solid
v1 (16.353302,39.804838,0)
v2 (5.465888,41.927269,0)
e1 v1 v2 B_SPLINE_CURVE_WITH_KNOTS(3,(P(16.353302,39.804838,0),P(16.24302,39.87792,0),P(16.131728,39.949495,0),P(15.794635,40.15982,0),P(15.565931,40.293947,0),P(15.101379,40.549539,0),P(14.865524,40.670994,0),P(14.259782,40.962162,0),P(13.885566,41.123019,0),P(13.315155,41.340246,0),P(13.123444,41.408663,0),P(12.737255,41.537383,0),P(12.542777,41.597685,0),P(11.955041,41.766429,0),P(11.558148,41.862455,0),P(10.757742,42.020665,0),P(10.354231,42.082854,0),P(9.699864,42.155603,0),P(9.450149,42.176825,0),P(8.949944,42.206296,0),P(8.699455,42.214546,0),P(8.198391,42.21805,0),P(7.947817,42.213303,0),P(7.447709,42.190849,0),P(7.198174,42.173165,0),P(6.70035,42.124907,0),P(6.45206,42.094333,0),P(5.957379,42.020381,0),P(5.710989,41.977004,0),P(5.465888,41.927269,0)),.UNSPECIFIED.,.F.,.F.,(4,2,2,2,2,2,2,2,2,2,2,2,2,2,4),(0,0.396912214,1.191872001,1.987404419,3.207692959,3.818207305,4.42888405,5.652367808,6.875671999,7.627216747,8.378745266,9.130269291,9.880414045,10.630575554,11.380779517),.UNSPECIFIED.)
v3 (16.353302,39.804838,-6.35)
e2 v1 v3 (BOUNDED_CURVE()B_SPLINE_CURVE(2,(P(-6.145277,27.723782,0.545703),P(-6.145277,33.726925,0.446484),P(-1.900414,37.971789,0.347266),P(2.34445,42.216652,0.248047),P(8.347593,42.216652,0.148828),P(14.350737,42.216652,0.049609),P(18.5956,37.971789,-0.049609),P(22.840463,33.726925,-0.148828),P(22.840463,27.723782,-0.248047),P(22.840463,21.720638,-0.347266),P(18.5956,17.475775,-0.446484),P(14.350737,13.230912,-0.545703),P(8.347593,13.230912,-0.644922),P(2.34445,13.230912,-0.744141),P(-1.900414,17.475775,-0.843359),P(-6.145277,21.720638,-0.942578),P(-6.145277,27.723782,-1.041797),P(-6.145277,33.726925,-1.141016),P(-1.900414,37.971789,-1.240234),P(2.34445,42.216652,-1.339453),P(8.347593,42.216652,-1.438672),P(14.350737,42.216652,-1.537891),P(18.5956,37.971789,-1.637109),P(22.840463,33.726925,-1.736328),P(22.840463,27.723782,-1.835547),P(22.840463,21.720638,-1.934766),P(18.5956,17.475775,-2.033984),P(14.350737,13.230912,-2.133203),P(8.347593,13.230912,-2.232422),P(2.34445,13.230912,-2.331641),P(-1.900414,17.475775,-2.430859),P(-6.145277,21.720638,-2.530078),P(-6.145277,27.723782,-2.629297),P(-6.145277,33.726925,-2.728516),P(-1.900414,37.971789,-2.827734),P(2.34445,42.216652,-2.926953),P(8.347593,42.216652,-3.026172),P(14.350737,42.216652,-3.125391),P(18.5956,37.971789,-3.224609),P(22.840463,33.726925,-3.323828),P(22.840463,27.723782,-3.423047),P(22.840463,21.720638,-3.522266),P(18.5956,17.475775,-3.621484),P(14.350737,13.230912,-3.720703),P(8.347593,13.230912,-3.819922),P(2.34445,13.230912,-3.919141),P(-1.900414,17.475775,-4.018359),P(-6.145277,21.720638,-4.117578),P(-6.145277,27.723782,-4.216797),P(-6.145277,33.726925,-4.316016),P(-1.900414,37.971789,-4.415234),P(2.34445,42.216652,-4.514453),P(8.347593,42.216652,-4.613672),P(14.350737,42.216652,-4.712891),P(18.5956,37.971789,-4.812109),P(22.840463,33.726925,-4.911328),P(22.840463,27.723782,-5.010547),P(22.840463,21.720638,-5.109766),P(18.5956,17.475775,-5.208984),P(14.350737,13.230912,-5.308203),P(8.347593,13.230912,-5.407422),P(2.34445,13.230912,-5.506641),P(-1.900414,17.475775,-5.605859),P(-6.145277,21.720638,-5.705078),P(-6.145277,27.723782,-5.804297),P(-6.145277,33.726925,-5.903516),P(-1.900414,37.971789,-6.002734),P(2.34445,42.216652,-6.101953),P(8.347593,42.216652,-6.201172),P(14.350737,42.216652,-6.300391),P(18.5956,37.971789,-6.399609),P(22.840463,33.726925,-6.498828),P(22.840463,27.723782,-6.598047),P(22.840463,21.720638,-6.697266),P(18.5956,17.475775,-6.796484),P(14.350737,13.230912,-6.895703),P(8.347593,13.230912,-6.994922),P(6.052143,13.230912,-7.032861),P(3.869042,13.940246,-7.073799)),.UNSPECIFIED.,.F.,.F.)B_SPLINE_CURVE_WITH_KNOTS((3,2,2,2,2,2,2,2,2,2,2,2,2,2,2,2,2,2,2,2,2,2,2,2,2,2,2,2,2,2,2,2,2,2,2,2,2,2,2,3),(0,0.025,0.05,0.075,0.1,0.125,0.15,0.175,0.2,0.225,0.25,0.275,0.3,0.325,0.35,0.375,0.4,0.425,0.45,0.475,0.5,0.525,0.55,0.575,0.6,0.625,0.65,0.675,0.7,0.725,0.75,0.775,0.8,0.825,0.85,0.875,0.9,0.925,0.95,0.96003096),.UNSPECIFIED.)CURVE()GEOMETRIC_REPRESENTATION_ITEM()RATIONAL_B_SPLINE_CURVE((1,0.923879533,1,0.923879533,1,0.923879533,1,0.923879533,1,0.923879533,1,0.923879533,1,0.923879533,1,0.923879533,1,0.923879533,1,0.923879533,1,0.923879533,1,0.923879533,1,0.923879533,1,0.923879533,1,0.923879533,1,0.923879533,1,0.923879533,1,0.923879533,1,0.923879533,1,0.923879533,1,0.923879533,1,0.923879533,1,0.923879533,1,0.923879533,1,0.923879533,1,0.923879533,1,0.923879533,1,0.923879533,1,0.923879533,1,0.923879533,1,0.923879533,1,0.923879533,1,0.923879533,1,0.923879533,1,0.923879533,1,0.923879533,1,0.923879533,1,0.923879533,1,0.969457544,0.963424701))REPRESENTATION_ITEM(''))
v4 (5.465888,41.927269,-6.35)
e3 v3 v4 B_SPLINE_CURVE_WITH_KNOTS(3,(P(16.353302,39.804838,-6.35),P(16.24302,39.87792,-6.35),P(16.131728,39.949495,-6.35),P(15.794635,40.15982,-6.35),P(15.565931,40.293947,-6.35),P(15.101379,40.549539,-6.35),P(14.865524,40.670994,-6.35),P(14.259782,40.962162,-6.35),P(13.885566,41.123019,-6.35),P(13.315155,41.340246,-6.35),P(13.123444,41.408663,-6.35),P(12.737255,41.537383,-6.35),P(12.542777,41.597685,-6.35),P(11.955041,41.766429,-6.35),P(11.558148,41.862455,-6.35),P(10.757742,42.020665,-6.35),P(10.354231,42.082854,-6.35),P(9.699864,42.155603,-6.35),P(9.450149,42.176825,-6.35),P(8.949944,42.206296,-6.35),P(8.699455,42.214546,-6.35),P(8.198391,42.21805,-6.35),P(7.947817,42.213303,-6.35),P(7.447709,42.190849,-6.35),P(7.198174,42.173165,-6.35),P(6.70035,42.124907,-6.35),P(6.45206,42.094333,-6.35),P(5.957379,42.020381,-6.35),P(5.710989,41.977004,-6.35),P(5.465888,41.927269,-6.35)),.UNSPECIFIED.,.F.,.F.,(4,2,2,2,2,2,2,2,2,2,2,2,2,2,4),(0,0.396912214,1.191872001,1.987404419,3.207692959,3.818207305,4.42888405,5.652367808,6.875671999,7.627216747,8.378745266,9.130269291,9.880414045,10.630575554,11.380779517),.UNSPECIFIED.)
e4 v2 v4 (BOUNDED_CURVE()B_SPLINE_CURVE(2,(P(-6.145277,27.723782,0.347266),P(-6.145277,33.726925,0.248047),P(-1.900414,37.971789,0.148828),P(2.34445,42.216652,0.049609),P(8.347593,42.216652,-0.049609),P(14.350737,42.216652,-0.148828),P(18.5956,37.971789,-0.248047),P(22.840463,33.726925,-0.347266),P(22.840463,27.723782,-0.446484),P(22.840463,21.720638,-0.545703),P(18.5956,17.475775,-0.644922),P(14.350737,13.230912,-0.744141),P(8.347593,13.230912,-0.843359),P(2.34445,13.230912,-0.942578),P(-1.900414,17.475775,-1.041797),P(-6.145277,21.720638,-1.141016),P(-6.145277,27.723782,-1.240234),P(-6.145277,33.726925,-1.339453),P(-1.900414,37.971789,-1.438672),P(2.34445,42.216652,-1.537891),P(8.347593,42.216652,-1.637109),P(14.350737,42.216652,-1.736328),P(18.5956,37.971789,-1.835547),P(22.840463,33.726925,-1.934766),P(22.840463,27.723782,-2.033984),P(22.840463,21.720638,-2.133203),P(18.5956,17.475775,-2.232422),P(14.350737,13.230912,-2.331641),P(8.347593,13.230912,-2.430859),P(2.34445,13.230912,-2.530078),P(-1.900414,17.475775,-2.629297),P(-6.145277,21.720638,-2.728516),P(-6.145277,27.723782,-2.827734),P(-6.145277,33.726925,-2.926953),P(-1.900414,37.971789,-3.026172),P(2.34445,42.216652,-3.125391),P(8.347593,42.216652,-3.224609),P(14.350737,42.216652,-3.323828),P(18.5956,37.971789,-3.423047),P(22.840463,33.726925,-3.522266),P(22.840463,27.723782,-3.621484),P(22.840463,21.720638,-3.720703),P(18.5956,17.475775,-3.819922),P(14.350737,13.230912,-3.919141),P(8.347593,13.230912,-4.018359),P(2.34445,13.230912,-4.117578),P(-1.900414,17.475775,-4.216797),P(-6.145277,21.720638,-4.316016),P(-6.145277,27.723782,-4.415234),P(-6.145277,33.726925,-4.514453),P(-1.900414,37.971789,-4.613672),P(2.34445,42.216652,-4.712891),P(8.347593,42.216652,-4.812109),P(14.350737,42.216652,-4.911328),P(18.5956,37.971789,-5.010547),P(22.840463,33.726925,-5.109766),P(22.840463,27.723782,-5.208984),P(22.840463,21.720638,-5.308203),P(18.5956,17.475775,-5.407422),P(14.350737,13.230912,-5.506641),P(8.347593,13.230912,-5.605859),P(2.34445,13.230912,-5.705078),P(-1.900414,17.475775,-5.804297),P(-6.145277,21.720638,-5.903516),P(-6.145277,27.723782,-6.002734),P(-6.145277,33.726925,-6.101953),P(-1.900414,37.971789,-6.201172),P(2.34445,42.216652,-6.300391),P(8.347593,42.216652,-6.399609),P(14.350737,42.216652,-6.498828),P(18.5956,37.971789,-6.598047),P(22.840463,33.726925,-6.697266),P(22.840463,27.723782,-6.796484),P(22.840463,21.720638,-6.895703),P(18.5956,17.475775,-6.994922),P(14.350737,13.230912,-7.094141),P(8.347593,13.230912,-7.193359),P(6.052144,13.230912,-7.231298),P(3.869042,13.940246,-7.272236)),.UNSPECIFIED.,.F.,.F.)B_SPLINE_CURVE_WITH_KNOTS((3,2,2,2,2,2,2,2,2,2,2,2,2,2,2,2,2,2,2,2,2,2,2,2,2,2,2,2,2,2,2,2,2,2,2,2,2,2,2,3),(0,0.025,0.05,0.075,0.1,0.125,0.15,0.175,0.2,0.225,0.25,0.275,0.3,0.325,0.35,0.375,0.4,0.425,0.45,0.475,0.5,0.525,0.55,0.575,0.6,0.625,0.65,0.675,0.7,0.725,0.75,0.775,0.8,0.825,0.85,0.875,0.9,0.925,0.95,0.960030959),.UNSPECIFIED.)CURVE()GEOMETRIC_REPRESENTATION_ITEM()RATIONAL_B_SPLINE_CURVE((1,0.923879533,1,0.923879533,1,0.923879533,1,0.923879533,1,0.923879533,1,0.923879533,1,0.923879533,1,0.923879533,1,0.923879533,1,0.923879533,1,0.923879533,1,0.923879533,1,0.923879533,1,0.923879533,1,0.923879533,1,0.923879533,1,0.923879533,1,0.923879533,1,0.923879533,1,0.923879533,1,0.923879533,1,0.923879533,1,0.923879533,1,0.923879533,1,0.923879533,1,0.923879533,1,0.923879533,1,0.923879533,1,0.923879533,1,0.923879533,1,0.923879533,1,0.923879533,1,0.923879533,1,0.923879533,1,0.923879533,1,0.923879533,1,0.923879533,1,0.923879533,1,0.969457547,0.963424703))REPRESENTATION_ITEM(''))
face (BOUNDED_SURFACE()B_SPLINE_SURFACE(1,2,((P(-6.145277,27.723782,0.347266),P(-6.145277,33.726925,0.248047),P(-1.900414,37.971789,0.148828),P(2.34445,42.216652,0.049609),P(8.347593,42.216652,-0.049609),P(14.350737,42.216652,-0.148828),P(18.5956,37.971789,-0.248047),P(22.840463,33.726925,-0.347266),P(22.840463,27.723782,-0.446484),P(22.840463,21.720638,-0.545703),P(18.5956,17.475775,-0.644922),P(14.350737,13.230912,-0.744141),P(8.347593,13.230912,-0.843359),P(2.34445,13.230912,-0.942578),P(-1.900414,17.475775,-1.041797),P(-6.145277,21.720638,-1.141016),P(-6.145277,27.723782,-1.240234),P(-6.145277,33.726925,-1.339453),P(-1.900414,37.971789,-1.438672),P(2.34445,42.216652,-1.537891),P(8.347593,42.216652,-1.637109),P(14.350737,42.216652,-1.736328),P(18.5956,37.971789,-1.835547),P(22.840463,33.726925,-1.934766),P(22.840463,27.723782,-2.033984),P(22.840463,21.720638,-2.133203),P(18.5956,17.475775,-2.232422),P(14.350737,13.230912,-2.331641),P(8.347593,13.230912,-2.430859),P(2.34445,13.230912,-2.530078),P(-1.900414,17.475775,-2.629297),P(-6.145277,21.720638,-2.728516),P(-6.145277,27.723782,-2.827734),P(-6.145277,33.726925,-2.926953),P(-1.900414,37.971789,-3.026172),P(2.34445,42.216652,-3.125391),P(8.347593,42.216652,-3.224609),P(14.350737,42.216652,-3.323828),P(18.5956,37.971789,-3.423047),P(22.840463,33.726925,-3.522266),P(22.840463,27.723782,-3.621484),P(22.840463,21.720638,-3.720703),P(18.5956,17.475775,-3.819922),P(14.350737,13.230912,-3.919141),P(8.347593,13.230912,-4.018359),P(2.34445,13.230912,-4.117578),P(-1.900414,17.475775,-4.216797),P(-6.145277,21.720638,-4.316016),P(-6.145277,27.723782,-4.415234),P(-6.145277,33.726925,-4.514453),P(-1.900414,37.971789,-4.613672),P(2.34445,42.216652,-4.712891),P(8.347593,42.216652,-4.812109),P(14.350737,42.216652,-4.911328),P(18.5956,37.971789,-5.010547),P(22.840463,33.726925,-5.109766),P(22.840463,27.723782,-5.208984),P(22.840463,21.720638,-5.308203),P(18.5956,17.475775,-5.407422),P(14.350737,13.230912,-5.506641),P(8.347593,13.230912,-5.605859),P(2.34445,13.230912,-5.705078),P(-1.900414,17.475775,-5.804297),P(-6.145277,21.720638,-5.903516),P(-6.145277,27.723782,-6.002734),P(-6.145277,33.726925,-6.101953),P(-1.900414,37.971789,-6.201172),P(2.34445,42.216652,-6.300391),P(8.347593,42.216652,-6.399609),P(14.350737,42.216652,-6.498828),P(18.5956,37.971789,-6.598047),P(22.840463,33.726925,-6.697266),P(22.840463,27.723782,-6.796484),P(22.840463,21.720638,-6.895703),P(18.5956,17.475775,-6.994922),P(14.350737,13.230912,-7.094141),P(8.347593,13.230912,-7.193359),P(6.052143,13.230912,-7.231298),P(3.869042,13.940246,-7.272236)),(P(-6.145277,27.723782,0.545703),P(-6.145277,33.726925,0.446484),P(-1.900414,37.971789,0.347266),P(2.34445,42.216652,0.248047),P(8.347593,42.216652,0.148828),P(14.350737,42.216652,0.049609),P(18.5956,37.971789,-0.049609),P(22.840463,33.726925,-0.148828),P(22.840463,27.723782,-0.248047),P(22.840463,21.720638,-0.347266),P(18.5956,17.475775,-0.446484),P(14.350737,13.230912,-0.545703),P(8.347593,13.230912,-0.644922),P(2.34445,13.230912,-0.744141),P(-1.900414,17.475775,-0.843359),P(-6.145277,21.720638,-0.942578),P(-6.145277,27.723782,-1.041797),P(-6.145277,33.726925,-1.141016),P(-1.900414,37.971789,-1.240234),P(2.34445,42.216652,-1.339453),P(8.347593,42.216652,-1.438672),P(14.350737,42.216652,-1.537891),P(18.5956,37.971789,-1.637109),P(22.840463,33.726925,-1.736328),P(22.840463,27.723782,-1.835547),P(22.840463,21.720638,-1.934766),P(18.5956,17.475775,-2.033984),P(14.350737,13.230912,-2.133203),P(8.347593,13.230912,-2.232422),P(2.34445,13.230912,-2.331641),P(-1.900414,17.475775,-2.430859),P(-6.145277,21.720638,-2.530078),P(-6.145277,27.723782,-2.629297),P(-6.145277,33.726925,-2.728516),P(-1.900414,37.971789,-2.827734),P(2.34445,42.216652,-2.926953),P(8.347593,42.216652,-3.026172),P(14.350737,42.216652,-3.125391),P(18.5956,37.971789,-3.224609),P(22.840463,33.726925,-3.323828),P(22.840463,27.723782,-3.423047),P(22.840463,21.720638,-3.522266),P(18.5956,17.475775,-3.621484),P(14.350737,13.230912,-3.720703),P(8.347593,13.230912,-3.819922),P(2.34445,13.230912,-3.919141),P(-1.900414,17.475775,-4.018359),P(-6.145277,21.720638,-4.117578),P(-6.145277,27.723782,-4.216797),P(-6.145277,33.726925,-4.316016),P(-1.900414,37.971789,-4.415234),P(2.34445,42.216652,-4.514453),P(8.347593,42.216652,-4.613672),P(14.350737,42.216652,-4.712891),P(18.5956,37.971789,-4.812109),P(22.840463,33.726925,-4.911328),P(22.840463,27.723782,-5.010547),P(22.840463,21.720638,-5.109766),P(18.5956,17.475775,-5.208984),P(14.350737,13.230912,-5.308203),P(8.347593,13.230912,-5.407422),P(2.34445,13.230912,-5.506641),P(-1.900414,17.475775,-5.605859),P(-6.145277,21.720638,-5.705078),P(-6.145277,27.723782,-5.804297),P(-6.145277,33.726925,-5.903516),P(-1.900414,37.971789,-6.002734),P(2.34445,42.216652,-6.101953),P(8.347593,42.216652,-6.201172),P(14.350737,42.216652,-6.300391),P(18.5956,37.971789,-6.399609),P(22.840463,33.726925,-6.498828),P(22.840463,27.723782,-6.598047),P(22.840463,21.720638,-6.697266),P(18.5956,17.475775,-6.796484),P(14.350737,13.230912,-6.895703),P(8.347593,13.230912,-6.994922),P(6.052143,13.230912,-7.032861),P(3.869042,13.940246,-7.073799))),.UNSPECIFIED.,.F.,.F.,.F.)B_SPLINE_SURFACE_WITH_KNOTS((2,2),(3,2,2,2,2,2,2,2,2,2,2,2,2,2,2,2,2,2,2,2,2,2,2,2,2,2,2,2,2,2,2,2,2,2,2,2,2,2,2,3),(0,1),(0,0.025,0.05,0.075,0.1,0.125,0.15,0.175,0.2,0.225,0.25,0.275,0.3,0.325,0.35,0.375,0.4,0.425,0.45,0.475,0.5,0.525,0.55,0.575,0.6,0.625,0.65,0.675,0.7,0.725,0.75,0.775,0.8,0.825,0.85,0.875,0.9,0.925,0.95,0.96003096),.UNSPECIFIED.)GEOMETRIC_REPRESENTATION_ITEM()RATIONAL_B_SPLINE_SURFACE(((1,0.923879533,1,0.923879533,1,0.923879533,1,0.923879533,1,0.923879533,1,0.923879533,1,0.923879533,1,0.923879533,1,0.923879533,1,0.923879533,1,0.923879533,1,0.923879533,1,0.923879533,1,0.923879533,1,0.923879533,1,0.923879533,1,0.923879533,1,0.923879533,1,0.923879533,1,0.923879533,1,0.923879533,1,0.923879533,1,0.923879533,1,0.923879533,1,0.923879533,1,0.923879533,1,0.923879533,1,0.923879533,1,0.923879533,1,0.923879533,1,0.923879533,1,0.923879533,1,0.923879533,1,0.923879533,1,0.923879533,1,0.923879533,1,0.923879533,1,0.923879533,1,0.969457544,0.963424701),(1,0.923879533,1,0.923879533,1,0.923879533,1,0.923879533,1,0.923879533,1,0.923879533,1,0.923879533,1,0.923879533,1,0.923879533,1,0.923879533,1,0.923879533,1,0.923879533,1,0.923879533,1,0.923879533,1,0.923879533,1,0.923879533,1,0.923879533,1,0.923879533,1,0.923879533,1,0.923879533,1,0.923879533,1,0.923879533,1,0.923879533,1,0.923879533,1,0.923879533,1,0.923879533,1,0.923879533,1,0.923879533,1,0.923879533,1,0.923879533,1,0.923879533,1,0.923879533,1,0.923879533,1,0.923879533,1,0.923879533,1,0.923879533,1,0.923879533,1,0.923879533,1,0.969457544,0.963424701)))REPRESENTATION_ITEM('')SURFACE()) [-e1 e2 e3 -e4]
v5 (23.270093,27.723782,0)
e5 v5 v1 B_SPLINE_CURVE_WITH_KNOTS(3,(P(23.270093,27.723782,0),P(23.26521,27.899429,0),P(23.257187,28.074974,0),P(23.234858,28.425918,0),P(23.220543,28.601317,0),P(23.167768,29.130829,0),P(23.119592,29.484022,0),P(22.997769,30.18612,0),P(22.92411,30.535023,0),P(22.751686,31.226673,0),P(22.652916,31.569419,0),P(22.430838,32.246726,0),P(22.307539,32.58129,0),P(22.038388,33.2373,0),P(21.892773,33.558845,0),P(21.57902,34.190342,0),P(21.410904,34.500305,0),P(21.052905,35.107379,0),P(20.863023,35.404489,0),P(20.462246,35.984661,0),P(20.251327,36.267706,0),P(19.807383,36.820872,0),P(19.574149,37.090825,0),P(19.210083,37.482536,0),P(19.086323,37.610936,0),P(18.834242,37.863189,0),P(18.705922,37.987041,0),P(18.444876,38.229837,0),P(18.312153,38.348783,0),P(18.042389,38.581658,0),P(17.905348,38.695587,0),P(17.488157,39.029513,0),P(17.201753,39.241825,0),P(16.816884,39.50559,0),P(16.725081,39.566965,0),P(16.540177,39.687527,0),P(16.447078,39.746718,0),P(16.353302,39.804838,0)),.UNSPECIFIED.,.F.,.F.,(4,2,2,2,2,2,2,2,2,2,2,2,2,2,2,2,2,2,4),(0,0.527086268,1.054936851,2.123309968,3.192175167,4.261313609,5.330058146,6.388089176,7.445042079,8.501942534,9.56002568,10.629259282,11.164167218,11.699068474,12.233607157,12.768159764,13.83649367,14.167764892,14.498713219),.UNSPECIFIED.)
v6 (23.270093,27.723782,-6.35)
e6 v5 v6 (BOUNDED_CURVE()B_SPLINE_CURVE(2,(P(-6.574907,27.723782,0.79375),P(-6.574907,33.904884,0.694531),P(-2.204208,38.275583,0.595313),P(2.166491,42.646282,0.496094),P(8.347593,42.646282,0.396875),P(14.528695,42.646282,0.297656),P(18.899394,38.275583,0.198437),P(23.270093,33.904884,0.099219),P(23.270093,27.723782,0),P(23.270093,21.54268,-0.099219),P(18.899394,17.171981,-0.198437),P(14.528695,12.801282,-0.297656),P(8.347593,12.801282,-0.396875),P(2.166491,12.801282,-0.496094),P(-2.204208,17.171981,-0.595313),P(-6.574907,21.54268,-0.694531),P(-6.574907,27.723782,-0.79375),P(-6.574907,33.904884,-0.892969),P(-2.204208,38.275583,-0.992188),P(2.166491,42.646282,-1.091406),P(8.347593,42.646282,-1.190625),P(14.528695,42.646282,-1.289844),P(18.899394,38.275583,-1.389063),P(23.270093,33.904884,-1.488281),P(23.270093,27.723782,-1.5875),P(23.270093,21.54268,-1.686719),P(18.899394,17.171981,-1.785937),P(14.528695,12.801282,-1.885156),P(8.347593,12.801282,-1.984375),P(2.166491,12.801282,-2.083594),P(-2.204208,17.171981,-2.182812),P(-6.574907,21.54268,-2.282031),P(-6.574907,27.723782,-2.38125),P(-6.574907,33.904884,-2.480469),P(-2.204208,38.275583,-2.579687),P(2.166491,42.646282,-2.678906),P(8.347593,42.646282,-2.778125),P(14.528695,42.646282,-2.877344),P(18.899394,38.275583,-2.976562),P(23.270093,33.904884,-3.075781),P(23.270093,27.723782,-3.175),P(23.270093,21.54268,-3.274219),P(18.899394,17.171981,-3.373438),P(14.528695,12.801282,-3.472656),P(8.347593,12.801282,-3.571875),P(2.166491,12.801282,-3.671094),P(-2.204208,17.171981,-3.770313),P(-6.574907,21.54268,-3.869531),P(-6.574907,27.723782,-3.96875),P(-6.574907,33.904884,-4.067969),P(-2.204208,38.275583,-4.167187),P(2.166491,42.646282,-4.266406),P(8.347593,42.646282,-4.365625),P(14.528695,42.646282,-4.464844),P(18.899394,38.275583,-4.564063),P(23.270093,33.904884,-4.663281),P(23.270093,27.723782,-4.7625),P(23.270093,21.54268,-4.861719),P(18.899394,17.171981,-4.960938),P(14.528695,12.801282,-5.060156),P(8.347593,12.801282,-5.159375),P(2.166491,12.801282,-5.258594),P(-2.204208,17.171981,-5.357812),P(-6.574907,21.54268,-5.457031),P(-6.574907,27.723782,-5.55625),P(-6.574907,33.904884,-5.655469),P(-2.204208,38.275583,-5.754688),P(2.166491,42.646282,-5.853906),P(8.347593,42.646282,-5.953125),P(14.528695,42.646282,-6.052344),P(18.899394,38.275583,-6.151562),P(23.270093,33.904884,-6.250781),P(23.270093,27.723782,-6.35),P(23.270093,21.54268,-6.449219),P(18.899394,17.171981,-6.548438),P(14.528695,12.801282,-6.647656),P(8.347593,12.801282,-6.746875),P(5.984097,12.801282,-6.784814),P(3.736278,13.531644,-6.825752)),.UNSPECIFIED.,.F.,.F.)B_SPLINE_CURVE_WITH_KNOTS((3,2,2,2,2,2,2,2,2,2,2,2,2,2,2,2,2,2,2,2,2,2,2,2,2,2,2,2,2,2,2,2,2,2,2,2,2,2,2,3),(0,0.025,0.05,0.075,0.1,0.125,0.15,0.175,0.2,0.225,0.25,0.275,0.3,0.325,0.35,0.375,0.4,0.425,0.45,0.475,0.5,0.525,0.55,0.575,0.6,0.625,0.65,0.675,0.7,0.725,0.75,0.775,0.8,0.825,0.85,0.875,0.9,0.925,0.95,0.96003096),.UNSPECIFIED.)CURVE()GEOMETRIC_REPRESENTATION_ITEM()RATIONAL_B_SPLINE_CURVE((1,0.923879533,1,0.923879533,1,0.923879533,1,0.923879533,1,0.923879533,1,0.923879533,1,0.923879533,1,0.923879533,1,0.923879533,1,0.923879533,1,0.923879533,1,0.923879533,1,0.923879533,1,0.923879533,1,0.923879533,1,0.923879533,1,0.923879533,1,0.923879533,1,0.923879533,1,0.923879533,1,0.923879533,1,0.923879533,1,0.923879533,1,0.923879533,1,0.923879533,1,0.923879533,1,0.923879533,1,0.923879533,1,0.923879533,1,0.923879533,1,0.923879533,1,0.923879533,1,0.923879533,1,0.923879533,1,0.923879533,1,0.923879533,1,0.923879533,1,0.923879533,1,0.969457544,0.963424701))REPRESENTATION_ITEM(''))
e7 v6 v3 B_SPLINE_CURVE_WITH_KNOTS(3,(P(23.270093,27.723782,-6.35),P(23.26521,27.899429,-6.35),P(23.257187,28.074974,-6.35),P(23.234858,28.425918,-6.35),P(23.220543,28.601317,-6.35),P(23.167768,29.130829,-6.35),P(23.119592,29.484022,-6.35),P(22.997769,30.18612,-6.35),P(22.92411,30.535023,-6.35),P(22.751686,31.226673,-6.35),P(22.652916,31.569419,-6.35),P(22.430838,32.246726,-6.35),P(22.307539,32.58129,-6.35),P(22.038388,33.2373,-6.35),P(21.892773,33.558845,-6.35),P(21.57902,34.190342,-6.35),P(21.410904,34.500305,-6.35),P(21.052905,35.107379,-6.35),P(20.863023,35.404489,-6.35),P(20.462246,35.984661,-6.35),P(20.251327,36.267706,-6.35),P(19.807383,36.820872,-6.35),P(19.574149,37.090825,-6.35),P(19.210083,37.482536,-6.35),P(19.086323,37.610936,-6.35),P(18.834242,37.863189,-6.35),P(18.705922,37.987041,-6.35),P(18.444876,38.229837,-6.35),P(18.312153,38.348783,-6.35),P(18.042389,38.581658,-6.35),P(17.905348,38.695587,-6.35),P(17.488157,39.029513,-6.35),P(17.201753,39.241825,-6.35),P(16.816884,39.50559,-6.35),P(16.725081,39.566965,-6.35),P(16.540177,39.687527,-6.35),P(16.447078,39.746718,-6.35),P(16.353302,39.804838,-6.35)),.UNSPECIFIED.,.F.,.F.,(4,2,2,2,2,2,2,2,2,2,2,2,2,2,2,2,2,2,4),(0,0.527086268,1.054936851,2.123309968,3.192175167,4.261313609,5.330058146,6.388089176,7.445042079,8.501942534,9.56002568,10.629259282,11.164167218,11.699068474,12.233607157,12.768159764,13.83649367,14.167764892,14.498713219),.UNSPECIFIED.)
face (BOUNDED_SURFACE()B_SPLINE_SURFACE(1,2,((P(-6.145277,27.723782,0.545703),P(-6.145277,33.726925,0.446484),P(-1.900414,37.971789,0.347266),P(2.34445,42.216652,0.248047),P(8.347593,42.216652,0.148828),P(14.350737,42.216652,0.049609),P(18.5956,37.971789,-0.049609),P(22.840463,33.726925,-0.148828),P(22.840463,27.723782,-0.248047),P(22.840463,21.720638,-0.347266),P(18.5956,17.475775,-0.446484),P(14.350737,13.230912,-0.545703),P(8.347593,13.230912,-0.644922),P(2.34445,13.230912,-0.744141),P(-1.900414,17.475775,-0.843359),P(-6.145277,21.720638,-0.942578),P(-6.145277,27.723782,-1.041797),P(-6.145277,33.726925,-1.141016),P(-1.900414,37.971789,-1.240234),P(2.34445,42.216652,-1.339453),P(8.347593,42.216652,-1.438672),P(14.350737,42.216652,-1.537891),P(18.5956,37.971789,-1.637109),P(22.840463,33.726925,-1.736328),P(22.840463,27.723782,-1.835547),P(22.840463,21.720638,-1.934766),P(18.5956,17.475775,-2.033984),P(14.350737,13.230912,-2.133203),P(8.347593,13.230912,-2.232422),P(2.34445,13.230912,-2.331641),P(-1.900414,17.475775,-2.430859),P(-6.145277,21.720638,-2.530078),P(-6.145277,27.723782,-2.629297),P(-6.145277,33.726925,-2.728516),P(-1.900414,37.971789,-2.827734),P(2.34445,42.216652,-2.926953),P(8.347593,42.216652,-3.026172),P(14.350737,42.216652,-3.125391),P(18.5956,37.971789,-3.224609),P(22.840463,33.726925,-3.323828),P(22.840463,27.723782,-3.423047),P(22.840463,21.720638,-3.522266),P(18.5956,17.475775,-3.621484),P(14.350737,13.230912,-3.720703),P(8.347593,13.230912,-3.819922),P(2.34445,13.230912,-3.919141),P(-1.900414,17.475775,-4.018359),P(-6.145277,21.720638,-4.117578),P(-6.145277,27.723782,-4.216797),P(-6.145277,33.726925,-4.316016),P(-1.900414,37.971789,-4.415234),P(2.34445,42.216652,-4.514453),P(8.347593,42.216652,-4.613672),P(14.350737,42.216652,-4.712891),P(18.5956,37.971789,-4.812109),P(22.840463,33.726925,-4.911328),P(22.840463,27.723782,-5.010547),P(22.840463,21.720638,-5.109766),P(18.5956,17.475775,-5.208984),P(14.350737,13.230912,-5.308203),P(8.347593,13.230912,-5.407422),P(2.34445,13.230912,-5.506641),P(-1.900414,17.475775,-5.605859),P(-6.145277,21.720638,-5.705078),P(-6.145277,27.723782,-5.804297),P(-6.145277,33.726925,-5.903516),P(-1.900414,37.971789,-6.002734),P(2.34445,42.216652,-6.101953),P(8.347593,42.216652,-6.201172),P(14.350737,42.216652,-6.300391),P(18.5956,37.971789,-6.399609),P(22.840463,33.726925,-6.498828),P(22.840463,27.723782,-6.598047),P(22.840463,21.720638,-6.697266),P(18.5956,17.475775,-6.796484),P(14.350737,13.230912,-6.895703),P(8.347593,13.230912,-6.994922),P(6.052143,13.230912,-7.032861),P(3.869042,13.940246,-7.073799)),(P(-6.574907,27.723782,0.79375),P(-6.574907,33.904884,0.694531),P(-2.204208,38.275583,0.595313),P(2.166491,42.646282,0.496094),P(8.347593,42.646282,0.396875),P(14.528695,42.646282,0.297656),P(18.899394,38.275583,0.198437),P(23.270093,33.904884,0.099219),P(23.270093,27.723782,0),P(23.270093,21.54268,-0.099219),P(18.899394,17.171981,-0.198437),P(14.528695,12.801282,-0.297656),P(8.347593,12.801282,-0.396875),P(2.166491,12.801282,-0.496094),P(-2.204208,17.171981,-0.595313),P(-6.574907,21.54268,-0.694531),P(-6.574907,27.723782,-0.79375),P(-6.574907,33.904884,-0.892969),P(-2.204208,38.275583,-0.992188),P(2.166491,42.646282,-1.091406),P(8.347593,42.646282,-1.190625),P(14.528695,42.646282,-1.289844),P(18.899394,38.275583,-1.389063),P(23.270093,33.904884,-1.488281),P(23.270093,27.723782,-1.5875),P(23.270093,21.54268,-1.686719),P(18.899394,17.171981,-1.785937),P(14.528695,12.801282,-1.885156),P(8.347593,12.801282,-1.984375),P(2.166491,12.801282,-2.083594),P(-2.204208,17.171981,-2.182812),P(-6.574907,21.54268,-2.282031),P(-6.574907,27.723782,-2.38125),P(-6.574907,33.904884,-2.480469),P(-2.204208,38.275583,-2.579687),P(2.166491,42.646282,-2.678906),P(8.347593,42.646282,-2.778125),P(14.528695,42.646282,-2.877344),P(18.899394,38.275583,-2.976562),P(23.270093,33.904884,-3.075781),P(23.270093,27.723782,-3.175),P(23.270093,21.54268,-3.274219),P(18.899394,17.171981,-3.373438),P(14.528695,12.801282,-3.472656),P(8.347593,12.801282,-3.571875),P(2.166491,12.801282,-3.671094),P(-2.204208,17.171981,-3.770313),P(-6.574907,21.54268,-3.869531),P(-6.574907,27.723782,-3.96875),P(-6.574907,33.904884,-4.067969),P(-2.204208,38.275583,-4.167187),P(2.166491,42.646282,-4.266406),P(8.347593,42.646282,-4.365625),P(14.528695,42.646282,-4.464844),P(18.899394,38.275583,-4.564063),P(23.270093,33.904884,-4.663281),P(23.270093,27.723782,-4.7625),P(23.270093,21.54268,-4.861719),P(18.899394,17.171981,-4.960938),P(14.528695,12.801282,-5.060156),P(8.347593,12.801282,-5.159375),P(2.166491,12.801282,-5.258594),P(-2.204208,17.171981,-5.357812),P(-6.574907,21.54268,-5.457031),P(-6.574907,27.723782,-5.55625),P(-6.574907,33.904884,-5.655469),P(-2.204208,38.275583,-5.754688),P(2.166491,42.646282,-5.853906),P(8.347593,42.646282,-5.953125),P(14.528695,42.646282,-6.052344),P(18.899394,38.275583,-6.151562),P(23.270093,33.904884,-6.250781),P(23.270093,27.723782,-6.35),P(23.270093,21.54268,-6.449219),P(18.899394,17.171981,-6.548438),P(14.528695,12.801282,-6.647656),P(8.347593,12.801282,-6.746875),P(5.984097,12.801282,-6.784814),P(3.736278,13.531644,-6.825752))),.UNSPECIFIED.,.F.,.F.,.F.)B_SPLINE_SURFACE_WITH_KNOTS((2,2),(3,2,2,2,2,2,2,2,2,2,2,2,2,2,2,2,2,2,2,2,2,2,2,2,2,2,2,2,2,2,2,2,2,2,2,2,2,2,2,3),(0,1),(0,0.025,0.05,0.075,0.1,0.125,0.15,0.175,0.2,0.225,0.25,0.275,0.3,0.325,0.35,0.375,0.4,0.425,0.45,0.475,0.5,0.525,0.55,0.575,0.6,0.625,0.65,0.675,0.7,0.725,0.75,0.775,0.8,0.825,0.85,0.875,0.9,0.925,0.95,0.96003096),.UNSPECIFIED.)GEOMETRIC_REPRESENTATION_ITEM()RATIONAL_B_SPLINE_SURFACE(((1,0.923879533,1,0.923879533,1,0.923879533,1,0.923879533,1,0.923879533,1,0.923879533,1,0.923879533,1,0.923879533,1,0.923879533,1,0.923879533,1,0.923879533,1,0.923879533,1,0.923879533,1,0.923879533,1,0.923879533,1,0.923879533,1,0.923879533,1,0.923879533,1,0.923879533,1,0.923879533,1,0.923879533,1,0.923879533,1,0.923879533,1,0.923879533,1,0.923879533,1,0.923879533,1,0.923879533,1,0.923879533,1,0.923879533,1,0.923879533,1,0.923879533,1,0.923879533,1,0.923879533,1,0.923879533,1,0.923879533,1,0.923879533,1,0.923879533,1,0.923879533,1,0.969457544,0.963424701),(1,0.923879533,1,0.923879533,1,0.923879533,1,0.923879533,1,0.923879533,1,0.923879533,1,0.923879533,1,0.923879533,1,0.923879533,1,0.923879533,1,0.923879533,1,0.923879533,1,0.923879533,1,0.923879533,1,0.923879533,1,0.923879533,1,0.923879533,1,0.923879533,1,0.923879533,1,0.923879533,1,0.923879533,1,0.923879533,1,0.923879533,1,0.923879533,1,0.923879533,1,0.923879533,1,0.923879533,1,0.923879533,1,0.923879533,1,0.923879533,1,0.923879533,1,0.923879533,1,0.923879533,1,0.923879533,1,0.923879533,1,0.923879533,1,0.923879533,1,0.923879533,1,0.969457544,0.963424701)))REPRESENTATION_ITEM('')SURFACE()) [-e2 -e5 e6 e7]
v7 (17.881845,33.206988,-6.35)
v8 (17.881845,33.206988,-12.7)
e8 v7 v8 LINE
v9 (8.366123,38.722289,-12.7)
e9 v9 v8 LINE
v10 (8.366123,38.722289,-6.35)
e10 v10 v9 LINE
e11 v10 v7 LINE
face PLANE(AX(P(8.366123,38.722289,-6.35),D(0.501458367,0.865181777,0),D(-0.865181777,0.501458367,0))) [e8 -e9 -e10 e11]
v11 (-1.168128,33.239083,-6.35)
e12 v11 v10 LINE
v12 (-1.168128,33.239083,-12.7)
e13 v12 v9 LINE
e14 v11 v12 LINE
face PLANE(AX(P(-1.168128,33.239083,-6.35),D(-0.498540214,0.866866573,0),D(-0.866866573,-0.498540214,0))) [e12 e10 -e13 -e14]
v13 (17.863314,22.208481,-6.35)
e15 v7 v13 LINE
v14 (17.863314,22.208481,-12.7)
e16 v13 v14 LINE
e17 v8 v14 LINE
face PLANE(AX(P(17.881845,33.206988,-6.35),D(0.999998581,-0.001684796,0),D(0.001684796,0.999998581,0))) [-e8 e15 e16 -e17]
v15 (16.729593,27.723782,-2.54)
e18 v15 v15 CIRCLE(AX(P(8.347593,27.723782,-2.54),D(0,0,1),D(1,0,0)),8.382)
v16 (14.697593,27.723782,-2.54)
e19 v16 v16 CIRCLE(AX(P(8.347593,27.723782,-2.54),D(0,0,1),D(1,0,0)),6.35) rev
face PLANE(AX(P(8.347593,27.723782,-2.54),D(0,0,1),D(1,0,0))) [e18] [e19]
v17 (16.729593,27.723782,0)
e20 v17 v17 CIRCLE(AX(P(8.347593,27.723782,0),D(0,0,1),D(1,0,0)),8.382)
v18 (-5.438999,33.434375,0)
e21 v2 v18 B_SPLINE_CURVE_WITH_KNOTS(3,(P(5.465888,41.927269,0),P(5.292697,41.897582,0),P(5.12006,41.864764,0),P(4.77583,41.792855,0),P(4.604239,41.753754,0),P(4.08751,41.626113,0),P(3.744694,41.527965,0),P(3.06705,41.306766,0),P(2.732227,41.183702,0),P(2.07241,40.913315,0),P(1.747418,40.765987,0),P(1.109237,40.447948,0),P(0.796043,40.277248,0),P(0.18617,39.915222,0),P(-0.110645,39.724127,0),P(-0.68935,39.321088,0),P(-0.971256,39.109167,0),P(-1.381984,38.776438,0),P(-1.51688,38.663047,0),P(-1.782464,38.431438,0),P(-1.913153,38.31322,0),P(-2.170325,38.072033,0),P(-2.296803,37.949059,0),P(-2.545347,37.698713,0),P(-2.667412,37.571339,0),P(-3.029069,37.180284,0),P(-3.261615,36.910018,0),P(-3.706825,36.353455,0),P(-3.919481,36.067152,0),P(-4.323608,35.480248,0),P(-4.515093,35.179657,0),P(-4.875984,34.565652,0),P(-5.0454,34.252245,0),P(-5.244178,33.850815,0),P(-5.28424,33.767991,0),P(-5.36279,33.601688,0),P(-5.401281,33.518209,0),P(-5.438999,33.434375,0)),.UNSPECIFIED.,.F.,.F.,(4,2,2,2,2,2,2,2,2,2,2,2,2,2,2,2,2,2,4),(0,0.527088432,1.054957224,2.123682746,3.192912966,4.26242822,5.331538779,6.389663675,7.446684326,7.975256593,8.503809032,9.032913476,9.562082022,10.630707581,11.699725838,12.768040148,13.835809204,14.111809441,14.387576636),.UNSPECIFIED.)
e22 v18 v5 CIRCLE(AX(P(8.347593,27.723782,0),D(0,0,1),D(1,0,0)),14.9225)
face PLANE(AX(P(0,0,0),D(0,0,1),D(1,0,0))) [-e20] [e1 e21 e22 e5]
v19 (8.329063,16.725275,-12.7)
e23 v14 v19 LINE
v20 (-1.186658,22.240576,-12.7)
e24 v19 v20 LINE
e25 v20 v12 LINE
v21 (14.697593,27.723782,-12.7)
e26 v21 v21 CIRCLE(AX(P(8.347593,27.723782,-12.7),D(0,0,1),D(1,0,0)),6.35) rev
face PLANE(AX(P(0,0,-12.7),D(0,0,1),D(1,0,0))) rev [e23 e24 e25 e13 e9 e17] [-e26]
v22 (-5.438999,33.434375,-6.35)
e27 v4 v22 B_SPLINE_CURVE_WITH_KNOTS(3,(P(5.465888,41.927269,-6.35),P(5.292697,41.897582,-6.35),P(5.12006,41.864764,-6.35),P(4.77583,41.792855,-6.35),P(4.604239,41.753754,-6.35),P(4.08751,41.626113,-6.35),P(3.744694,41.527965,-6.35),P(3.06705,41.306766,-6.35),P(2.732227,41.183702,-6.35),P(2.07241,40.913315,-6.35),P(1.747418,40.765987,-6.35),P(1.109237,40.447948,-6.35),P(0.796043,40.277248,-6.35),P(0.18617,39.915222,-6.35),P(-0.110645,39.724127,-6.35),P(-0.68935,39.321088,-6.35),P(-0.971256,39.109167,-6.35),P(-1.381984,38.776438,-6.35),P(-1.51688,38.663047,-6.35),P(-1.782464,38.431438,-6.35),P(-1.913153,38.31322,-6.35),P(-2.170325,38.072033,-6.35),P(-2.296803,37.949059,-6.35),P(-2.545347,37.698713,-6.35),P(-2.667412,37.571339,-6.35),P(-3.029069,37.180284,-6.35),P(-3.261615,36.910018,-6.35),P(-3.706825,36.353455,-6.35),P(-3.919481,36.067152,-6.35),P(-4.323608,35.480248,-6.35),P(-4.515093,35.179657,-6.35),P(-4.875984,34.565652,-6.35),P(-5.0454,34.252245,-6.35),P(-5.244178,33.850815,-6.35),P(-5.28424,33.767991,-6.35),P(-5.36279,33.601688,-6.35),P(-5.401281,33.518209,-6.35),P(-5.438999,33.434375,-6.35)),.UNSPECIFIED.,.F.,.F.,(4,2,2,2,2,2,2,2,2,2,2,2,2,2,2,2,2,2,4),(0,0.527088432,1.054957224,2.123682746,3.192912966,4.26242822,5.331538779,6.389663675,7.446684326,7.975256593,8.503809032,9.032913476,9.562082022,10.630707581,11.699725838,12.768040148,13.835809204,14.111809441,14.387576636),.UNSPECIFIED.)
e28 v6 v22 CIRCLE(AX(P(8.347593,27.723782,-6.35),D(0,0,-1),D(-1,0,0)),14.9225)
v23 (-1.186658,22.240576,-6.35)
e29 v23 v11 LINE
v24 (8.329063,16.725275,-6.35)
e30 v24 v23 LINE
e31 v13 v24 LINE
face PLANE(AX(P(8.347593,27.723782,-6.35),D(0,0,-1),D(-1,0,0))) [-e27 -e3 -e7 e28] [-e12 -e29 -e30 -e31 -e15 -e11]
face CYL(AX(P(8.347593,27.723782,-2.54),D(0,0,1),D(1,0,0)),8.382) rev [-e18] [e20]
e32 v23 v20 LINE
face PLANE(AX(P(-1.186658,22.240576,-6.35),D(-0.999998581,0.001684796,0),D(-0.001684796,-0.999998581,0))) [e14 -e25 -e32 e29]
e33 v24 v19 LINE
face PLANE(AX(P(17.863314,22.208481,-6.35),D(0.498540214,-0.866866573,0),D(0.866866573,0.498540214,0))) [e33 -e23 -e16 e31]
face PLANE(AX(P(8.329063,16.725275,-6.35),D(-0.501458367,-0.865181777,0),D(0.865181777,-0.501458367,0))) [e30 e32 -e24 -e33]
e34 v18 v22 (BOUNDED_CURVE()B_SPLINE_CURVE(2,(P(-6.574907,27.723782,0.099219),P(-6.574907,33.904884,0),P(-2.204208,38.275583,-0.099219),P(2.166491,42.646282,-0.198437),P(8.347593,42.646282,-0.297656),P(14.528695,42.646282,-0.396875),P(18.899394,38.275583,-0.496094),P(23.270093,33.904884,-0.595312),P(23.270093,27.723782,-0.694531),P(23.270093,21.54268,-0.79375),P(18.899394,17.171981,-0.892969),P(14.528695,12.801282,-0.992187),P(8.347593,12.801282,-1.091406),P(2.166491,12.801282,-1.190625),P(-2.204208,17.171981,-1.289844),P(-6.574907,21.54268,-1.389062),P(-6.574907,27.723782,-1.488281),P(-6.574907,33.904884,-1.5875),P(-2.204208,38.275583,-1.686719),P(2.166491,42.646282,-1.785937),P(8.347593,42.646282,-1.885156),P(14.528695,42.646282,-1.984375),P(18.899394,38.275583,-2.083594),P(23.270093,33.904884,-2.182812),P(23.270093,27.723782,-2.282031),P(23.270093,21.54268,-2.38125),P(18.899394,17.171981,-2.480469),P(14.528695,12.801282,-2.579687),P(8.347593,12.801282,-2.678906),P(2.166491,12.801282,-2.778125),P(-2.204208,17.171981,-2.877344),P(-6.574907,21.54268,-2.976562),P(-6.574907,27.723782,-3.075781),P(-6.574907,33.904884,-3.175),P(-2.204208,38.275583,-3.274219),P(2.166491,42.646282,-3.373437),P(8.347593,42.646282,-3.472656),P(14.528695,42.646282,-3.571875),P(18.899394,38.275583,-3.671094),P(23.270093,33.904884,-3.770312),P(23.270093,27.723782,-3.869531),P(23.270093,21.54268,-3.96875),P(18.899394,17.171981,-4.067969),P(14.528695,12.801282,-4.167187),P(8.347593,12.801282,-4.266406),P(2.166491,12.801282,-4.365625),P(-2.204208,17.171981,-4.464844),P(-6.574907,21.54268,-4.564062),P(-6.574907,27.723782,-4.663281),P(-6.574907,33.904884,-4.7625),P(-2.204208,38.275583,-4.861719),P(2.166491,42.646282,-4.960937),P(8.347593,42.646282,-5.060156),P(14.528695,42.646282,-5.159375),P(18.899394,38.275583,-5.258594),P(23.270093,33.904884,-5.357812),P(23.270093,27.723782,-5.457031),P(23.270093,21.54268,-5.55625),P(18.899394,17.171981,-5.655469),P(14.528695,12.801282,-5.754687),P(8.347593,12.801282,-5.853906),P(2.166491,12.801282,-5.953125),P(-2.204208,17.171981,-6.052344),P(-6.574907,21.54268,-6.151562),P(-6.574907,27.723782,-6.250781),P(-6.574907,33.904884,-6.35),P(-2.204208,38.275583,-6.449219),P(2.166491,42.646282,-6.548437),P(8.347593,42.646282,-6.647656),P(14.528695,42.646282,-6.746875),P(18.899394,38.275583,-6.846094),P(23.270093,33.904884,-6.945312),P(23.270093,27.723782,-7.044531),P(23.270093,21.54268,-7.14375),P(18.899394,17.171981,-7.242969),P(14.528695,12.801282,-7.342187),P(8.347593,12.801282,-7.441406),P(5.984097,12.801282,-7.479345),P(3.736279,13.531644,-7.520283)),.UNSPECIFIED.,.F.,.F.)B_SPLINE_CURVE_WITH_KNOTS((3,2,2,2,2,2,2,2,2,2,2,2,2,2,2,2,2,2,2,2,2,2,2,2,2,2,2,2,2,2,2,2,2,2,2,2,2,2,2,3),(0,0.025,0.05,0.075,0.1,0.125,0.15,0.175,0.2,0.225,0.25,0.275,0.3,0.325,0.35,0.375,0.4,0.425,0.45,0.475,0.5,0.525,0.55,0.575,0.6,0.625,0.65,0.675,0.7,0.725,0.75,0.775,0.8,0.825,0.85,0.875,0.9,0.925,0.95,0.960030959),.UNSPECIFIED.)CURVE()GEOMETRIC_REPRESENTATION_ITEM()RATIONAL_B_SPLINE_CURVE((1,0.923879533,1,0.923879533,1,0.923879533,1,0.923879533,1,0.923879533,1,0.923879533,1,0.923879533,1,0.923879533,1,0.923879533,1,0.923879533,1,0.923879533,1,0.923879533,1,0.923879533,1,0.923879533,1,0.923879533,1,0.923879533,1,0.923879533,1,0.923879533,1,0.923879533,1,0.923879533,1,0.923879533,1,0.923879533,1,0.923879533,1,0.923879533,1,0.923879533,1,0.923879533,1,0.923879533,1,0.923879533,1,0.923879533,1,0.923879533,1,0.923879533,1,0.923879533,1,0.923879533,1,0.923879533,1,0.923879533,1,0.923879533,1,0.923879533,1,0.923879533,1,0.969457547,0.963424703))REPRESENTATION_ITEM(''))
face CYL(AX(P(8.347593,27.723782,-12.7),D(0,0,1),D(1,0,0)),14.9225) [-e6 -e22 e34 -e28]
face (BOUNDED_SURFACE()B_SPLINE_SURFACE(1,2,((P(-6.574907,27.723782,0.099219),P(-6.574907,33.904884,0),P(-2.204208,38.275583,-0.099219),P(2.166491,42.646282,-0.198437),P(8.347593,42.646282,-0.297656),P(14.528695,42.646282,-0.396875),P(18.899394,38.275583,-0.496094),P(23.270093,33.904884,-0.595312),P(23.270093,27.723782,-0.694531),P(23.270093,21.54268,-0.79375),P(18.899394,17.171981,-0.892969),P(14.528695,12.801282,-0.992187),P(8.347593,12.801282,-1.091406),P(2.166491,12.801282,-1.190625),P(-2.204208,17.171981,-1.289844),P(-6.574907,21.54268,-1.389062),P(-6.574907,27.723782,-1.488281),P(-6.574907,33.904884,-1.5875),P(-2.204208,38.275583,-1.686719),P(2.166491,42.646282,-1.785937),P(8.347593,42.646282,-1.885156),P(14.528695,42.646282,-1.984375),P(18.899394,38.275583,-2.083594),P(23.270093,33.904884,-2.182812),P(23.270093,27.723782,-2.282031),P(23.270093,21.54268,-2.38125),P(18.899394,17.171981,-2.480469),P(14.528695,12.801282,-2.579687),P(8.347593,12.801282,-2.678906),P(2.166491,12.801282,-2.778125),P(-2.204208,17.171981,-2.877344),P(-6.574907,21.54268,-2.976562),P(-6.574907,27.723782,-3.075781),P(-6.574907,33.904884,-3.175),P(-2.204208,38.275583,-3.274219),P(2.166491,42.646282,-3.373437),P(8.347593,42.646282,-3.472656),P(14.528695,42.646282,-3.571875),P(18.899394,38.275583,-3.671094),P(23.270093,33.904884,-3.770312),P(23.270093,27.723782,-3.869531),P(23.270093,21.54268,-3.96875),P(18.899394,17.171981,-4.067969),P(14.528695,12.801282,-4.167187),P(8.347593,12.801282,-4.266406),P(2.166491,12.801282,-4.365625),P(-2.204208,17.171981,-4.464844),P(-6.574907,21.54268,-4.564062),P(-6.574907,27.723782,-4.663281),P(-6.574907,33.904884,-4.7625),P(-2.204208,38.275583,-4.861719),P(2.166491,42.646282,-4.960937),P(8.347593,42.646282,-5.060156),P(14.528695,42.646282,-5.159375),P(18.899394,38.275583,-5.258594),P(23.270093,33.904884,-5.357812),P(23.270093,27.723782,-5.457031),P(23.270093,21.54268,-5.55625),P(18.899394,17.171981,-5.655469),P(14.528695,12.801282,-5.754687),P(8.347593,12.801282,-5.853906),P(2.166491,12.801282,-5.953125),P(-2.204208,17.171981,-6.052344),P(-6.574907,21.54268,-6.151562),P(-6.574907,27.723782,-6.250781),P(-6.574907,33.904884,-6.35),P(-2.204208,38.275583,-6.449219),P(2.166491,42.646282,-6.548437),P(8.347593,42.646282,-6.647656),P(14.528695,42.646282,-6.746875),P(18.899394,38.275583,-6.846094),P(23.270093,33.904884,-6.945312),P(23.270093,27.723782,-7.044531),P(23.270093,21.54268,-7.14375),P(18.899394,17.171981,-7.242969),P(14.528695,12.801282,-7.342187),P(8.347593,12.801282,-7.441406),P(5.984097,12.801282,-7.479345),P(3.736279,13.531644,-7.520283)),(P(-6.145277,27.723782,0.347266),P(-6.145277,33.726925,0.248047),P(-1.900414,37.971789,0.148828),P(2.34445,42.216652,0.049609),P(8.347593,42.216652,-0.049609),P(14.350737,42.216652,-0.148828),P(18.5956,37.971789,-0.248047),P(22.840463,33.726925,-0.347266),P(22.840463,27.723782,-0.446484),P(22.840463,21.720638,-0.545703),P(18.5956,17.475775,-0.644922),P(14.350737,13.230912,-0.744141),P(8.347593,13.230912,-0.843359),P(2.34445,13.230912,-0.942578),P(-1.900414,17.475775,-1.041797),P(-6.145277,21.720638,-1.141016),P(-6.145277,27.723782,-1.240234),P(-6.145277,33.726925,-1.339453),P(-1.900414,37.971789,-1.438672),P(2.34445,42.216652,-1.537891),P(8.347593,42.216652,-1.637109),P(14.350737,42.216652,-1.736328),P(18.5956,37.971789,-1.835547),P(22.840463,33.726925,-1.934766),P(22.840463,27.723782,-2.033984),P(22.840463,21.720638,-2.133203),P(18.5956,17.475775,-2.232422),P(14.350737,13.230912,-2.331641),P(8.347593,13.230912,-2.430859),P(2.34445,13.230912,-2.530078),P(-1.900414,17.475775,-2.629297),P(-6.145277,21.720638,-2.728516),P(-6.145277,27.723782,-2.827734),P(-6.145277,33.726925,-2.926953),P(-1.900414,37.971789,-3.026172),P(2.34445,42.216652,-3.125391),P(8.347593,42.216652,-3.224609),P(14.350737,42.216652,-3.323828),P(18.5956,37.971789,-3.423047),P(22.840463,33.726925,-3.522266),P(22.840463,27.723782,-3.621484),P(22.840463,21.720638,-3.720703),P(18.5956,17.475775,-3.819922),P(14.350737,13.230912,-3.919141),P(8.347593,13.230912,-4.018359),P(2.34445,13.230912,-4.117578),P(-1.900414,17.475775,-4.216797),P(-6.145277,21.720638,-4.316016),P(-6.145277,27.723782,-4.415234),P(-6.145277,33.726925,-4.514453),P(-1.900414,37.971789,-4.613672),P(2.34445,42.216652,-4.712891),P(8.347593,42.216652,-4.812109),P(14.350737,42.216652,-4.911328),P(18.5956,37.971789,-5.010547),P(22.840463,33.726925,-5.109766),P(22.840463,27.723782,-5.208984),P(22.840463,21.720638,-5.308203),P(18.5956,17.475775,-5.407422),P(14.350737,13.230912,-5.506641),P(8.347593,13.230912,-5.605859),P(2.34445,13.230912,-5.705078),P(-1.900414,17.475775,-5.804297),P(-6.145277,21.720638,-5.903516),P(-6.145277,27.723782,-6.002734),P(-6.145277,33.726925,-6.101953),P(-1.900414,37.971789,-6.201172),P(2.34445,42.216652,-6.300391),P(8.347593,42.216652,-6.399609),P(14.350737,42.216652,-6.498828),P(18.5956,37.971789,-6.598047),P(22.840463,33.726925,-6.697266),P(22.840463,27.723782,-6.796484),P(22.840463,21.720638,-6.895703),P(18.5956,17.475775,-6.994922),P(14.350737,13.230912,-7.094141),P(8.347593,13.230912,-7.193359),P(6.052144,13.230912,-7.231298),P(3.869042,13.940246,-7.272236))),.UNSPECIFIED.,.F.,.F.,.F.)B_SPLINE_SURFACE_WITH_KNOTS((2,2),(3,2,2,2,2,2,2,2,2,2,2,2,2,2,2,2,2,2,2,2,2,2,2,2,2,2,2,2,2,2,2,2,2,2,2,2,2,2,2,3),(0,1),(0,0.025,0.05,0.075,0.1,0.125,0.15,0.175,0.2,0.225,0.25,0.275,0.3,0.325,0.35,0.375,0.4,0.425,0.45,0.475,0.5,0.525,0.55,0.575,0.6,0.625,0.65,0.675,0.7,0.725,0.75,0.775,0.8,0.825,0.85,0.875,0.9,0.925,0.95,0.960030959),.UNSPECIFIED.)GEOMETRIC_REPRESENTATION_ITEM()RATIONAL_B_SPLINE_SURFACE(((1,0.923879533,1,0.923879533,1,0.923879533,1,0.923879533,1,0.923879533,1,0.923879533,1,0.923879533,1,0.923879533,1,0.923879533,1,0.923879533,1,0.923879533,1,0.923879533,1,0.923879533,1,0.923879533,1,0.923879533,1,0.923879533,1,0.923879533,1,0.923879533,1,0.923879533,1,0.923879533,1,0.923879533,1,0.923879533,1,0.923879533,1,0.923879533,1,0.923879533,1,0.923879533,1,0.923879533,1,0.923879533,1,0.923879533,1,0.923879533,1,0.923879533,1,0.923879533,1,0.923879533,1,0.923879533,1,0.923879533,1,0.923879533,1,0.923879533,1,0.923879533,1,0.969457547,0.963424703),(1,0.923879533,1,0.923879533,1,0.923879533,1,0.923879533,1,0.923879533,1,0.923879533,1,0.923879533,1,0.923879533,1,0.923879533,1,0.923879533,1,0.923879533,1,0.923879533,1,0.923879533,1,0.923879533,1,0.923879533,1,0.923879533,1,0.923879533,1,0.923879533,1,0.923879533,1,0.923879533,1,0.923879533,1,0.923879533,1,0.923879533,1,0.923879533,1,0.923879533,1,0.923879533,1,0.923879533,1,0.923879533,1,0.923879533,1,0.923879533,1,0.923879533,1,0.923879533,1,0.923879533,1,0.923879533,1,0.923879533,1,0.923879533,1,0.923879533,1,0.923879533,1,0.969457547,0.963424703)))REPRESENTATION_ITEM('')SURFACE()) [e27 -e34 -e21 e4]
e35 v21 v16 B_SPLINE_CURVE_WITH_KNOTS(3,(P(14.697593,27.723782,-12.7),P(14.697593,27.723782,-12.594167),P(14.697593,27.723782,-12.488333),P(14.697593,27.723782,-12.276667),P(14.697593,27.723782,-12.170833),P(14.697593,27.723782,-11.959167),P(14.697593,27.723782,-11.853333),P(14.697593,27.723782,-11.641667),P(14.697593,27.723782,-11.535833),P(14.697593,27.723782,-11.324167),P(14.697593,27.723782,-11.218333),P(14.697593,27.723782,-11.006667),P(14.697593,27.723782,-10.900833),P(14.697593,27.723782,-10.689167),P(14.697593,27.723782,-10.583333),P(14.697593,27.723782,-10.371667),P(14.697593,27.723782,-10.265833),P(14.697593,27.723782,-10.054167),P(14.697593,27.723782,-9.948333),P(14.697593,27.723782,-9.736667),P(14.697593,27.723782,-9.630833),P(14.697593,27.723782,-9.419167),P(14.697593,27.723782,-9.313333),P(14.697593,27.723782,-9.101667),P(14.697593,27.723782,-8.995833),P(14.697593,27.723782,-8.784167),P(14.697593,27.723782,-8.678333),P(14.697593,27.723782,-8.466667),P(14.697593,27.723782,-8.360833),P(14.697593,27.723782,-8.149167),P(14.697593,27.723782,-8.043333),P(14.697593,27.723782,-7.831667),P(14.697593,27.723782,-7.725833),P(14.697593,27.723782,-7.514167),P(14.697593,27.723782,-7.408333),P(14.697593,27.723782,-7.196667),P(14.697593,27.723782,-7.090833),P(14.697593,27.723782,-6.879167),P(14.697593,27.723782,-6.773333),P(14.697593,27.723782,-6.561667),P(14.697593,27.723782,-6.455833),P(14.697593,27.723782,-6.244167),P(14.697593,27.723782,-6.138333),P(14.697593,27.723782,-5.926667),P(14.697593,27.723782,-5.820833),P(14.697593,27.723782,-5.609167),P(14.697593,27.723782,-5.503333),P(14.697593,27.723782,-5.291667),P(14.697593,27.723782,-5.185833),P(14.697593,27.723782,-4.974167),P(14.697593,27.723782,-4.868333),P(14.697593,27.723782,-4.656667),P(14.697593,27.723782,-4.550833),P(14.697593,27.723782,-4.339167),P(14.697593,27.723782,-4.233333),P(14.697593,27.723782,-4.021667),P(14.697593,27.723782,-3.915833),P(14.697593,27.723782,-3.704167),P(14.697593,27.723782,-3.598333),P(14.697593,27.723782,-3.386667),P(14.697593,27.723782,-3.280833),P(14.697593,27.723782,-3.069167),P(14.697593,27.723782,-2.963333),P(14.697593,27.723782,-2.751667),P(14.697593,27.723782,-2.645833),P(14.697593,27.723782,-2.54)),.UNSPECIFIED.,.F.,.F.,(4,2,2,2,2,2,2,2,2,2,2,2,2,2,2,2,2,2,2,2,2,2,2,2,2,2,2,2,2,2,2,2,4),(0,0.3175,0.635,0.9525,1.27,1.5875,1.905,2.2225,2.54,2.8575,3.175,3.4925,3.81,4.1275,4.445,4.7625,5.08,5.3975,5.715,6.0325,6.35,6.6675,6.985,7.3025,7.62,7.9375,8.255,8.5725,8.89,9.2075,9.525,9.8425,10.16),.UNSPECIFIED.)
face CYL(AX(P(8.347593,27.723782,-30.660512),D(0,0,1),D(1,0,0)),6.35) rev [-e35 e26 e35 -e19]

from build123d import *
from build123d.topology import SkipClean

# Parameters (mm, degrees)
SKETCH3_R           = 14.9225
BOSS_EXTRUDE1_DEPTH = 12.7
SKETCH11_R          = 6.35
CUT_EXTRUDE3_DEPTH  = 12.7
SKETCH12_R          = 8.382
CUT_EXTRUDE4_DEPTH  = 2.54
THREAD1_PITCH       = 1.5875
CUT_EXTRUDE6_START  = -6.35
SKETCH14_R          = 14.9225
CUT_EXTRUDE6_DEPTH  = 6.35


with BuildPart() as part:
    # Sketch3 → Boss-Extrude1 (new body)
    with BuildSketch(Plane.XY):
        with Locations((8.347593151, 27.723781851)):
            Circle(SKETCH3_R)
    extrude(amount=-BOSS_EXTRUDE1_DEPTH)

    # Sketch11 → Cut-Extrude3 (cut)
    with BuildSketch(Plane.XY):
        with Locations((8.347593151, 27.723781851)):
            Circle(SKETCH11_R)
    extrude(amount=-CUT_EXTRUDE3_DEPTH, mode=Mode.SUBTRACT)

    # Sketch12 → Cut-Extrude4 (cut)
    with BuildSketch(Plane.XY):
        with Locations((8.347593151, 27.723781851)):
            Circle(SKETCH12_R)
    extrude(amount=-CUT_EXTRUDE4_DEPTH, mode=Mode.SUBTRACT)

    # Thread1: the profile of Thread Profile1 profile screwed along a right-hand helix of 4.8 turns, 8 arcs to a turn; built about Z, then put on its axis
    thread1_z = Axis((0, 0, 0), (0, 0, 1))
    thread1_corners = [(14.9228, 0, -0.000173205), (14.9228, 0, 0.694704453), (14.492870212, 0, 0.446484374), (14.492870212, 0, 0.248046874)]
    with BuildLine(mode=Mode.PRIVATE) as thread1_profile:
        Line(thread1_corners[0], thread1_corners[1])
        Line(thread1_corners[1], thread1_corners[2])
        Line(thread1_corners[2], thread1_corners[3])
        Line(thread1_corners[3], thread1_corners[0])
    thread1_cap = Face(thread1_profile.wire())
    thread1_turn_angles = [0, 22.5, 45, 67.5, 90, 112.5, 135, 157.5, 180, 202.5, 225, 247.5, 270, 292.5, 315, 337.5, 360]
    thread1_turn_weights = [1, 0.9238795325112867, 1, 0.9238795325112867, 1, 0.9238795325112867, 1, 0.9238795325112867, 1, 0.9238795325112867, 1, 0.9238795325112867, 1, 0.9238795325112867, 1, 0.9238795325112867, 1]
    thread1_turn_rails = [Edge.make_bspline([Vector(p[0], p[1], 0).rotate(thread1_z, thread1_turn_angles[k]) / thread1_turn_weights[k] + Vector(0, 0, p[2] + THREAD1_PITCH * thread1_turn_angles[k] / 360) for k in range(17)], [0, 0, 0, 1, 1, 2, 2, 3, 3, 4, 4, 5, 5, 6, 6, 7, 7, 8, 8, 8], 2, thread1_turn_weights) for p in thread1_corners]
    thread1_turn_sides = [Face.make_surface_from_curves(thread1_turn_rails[p[0]], thread1_turn_rails[p[1]]) for p in [(0, 1), (1, 2), (2, 3), (3, 0)]]
    thread1_last_angles = [1440, 1462.5, 1485, 1507.5, 1530, 1552.5, 1575, 1597.5, 1620, 1642.5, 1665, 1687.5, 1710, 1719, 1728]
    thread1_last_weights = [1, 0.9238795325112867, 1, 0.9238795325112867, 1, 0.9238795325112867, 1, 0.9238795325112867, 1, 0.9238795325112867, 1, 0.9238795325112867, 1, 0.9876883405951378, 1]
    thread1_last_rails = [Edge.make_bspline([Vector(p[0], p[1], 0).rotate(thread1_z, thread1_last_angles[k]) / thread1_last_weights[k] + Vector(0, 0, p[2] + THREAD1_PITCH * thread1_last_angles[k] / 360) for k in range(15)], [0, 0, 0, 1, 1, 2, 2, 3, 3, 4, 4, 5, 5, 6, 6, 7, 7, 7], 2, thread1_last_weights) for p in thread1_corners]
    thread1_last_sides = [Face.make_surface_from_curves(thread1_last_rails[p[0]], thread1_last_rails[p[1]]) for p in [(0, 1), (1, 2), (2, 3), (3, 0)]]
    thread1 = Plane(origin=(8.347593151, 27.723781851, 0.79375), x_dir=(-1, 0, 0), z_dir=(0, 0, -1)) * Solid(Shell([*[p.moved(Location((0, 0, THREAD1_PITCH * i))) for i in range(4) for p in thread1_turn_sides], *thread1_last_sides, thread1_cap, thread1_cap.rotate(thread1_z, 1728).moved(Location((0, 0, THREAD1_PITCH * 1728 / 360)))]))
    add(thread1, mode=Mode.SUBTRACT)

    # Sketch14 → Cut-Extrude6 (cut)
    with SkipClean():  # the faces are left unmerged after this step: merging them gives an invalid solid
        with BuildSketch(Plane(origin=(0, 0, -12.7), x_dir=(-1, 0, 0), z_dir=(0, 0, -1)).offset(CUT_EXTRUDE6_START)):
            with Locations((-8.347593151, 27.723781851)):
                Circle(SKETCH14_R)
            Polygon((1.186658464, 22.240576024), (1.168128197, 33.239083042), (-8.366123418, 38.722288869), (-17.881844766, 33.206987678), (-17.863314499, 22.20848066), (-8.329062884, 16.725274833), align=None, mode=Mode.SUBTRACT)
        extrude(amount=CUT_EXTRUDE6_DEPTH, mode=Mode.SUBTRACT)
    add(part.part.scale(1), mode=Mode.REPLACE)  # the faces are merged on a copy


solid = part.part
